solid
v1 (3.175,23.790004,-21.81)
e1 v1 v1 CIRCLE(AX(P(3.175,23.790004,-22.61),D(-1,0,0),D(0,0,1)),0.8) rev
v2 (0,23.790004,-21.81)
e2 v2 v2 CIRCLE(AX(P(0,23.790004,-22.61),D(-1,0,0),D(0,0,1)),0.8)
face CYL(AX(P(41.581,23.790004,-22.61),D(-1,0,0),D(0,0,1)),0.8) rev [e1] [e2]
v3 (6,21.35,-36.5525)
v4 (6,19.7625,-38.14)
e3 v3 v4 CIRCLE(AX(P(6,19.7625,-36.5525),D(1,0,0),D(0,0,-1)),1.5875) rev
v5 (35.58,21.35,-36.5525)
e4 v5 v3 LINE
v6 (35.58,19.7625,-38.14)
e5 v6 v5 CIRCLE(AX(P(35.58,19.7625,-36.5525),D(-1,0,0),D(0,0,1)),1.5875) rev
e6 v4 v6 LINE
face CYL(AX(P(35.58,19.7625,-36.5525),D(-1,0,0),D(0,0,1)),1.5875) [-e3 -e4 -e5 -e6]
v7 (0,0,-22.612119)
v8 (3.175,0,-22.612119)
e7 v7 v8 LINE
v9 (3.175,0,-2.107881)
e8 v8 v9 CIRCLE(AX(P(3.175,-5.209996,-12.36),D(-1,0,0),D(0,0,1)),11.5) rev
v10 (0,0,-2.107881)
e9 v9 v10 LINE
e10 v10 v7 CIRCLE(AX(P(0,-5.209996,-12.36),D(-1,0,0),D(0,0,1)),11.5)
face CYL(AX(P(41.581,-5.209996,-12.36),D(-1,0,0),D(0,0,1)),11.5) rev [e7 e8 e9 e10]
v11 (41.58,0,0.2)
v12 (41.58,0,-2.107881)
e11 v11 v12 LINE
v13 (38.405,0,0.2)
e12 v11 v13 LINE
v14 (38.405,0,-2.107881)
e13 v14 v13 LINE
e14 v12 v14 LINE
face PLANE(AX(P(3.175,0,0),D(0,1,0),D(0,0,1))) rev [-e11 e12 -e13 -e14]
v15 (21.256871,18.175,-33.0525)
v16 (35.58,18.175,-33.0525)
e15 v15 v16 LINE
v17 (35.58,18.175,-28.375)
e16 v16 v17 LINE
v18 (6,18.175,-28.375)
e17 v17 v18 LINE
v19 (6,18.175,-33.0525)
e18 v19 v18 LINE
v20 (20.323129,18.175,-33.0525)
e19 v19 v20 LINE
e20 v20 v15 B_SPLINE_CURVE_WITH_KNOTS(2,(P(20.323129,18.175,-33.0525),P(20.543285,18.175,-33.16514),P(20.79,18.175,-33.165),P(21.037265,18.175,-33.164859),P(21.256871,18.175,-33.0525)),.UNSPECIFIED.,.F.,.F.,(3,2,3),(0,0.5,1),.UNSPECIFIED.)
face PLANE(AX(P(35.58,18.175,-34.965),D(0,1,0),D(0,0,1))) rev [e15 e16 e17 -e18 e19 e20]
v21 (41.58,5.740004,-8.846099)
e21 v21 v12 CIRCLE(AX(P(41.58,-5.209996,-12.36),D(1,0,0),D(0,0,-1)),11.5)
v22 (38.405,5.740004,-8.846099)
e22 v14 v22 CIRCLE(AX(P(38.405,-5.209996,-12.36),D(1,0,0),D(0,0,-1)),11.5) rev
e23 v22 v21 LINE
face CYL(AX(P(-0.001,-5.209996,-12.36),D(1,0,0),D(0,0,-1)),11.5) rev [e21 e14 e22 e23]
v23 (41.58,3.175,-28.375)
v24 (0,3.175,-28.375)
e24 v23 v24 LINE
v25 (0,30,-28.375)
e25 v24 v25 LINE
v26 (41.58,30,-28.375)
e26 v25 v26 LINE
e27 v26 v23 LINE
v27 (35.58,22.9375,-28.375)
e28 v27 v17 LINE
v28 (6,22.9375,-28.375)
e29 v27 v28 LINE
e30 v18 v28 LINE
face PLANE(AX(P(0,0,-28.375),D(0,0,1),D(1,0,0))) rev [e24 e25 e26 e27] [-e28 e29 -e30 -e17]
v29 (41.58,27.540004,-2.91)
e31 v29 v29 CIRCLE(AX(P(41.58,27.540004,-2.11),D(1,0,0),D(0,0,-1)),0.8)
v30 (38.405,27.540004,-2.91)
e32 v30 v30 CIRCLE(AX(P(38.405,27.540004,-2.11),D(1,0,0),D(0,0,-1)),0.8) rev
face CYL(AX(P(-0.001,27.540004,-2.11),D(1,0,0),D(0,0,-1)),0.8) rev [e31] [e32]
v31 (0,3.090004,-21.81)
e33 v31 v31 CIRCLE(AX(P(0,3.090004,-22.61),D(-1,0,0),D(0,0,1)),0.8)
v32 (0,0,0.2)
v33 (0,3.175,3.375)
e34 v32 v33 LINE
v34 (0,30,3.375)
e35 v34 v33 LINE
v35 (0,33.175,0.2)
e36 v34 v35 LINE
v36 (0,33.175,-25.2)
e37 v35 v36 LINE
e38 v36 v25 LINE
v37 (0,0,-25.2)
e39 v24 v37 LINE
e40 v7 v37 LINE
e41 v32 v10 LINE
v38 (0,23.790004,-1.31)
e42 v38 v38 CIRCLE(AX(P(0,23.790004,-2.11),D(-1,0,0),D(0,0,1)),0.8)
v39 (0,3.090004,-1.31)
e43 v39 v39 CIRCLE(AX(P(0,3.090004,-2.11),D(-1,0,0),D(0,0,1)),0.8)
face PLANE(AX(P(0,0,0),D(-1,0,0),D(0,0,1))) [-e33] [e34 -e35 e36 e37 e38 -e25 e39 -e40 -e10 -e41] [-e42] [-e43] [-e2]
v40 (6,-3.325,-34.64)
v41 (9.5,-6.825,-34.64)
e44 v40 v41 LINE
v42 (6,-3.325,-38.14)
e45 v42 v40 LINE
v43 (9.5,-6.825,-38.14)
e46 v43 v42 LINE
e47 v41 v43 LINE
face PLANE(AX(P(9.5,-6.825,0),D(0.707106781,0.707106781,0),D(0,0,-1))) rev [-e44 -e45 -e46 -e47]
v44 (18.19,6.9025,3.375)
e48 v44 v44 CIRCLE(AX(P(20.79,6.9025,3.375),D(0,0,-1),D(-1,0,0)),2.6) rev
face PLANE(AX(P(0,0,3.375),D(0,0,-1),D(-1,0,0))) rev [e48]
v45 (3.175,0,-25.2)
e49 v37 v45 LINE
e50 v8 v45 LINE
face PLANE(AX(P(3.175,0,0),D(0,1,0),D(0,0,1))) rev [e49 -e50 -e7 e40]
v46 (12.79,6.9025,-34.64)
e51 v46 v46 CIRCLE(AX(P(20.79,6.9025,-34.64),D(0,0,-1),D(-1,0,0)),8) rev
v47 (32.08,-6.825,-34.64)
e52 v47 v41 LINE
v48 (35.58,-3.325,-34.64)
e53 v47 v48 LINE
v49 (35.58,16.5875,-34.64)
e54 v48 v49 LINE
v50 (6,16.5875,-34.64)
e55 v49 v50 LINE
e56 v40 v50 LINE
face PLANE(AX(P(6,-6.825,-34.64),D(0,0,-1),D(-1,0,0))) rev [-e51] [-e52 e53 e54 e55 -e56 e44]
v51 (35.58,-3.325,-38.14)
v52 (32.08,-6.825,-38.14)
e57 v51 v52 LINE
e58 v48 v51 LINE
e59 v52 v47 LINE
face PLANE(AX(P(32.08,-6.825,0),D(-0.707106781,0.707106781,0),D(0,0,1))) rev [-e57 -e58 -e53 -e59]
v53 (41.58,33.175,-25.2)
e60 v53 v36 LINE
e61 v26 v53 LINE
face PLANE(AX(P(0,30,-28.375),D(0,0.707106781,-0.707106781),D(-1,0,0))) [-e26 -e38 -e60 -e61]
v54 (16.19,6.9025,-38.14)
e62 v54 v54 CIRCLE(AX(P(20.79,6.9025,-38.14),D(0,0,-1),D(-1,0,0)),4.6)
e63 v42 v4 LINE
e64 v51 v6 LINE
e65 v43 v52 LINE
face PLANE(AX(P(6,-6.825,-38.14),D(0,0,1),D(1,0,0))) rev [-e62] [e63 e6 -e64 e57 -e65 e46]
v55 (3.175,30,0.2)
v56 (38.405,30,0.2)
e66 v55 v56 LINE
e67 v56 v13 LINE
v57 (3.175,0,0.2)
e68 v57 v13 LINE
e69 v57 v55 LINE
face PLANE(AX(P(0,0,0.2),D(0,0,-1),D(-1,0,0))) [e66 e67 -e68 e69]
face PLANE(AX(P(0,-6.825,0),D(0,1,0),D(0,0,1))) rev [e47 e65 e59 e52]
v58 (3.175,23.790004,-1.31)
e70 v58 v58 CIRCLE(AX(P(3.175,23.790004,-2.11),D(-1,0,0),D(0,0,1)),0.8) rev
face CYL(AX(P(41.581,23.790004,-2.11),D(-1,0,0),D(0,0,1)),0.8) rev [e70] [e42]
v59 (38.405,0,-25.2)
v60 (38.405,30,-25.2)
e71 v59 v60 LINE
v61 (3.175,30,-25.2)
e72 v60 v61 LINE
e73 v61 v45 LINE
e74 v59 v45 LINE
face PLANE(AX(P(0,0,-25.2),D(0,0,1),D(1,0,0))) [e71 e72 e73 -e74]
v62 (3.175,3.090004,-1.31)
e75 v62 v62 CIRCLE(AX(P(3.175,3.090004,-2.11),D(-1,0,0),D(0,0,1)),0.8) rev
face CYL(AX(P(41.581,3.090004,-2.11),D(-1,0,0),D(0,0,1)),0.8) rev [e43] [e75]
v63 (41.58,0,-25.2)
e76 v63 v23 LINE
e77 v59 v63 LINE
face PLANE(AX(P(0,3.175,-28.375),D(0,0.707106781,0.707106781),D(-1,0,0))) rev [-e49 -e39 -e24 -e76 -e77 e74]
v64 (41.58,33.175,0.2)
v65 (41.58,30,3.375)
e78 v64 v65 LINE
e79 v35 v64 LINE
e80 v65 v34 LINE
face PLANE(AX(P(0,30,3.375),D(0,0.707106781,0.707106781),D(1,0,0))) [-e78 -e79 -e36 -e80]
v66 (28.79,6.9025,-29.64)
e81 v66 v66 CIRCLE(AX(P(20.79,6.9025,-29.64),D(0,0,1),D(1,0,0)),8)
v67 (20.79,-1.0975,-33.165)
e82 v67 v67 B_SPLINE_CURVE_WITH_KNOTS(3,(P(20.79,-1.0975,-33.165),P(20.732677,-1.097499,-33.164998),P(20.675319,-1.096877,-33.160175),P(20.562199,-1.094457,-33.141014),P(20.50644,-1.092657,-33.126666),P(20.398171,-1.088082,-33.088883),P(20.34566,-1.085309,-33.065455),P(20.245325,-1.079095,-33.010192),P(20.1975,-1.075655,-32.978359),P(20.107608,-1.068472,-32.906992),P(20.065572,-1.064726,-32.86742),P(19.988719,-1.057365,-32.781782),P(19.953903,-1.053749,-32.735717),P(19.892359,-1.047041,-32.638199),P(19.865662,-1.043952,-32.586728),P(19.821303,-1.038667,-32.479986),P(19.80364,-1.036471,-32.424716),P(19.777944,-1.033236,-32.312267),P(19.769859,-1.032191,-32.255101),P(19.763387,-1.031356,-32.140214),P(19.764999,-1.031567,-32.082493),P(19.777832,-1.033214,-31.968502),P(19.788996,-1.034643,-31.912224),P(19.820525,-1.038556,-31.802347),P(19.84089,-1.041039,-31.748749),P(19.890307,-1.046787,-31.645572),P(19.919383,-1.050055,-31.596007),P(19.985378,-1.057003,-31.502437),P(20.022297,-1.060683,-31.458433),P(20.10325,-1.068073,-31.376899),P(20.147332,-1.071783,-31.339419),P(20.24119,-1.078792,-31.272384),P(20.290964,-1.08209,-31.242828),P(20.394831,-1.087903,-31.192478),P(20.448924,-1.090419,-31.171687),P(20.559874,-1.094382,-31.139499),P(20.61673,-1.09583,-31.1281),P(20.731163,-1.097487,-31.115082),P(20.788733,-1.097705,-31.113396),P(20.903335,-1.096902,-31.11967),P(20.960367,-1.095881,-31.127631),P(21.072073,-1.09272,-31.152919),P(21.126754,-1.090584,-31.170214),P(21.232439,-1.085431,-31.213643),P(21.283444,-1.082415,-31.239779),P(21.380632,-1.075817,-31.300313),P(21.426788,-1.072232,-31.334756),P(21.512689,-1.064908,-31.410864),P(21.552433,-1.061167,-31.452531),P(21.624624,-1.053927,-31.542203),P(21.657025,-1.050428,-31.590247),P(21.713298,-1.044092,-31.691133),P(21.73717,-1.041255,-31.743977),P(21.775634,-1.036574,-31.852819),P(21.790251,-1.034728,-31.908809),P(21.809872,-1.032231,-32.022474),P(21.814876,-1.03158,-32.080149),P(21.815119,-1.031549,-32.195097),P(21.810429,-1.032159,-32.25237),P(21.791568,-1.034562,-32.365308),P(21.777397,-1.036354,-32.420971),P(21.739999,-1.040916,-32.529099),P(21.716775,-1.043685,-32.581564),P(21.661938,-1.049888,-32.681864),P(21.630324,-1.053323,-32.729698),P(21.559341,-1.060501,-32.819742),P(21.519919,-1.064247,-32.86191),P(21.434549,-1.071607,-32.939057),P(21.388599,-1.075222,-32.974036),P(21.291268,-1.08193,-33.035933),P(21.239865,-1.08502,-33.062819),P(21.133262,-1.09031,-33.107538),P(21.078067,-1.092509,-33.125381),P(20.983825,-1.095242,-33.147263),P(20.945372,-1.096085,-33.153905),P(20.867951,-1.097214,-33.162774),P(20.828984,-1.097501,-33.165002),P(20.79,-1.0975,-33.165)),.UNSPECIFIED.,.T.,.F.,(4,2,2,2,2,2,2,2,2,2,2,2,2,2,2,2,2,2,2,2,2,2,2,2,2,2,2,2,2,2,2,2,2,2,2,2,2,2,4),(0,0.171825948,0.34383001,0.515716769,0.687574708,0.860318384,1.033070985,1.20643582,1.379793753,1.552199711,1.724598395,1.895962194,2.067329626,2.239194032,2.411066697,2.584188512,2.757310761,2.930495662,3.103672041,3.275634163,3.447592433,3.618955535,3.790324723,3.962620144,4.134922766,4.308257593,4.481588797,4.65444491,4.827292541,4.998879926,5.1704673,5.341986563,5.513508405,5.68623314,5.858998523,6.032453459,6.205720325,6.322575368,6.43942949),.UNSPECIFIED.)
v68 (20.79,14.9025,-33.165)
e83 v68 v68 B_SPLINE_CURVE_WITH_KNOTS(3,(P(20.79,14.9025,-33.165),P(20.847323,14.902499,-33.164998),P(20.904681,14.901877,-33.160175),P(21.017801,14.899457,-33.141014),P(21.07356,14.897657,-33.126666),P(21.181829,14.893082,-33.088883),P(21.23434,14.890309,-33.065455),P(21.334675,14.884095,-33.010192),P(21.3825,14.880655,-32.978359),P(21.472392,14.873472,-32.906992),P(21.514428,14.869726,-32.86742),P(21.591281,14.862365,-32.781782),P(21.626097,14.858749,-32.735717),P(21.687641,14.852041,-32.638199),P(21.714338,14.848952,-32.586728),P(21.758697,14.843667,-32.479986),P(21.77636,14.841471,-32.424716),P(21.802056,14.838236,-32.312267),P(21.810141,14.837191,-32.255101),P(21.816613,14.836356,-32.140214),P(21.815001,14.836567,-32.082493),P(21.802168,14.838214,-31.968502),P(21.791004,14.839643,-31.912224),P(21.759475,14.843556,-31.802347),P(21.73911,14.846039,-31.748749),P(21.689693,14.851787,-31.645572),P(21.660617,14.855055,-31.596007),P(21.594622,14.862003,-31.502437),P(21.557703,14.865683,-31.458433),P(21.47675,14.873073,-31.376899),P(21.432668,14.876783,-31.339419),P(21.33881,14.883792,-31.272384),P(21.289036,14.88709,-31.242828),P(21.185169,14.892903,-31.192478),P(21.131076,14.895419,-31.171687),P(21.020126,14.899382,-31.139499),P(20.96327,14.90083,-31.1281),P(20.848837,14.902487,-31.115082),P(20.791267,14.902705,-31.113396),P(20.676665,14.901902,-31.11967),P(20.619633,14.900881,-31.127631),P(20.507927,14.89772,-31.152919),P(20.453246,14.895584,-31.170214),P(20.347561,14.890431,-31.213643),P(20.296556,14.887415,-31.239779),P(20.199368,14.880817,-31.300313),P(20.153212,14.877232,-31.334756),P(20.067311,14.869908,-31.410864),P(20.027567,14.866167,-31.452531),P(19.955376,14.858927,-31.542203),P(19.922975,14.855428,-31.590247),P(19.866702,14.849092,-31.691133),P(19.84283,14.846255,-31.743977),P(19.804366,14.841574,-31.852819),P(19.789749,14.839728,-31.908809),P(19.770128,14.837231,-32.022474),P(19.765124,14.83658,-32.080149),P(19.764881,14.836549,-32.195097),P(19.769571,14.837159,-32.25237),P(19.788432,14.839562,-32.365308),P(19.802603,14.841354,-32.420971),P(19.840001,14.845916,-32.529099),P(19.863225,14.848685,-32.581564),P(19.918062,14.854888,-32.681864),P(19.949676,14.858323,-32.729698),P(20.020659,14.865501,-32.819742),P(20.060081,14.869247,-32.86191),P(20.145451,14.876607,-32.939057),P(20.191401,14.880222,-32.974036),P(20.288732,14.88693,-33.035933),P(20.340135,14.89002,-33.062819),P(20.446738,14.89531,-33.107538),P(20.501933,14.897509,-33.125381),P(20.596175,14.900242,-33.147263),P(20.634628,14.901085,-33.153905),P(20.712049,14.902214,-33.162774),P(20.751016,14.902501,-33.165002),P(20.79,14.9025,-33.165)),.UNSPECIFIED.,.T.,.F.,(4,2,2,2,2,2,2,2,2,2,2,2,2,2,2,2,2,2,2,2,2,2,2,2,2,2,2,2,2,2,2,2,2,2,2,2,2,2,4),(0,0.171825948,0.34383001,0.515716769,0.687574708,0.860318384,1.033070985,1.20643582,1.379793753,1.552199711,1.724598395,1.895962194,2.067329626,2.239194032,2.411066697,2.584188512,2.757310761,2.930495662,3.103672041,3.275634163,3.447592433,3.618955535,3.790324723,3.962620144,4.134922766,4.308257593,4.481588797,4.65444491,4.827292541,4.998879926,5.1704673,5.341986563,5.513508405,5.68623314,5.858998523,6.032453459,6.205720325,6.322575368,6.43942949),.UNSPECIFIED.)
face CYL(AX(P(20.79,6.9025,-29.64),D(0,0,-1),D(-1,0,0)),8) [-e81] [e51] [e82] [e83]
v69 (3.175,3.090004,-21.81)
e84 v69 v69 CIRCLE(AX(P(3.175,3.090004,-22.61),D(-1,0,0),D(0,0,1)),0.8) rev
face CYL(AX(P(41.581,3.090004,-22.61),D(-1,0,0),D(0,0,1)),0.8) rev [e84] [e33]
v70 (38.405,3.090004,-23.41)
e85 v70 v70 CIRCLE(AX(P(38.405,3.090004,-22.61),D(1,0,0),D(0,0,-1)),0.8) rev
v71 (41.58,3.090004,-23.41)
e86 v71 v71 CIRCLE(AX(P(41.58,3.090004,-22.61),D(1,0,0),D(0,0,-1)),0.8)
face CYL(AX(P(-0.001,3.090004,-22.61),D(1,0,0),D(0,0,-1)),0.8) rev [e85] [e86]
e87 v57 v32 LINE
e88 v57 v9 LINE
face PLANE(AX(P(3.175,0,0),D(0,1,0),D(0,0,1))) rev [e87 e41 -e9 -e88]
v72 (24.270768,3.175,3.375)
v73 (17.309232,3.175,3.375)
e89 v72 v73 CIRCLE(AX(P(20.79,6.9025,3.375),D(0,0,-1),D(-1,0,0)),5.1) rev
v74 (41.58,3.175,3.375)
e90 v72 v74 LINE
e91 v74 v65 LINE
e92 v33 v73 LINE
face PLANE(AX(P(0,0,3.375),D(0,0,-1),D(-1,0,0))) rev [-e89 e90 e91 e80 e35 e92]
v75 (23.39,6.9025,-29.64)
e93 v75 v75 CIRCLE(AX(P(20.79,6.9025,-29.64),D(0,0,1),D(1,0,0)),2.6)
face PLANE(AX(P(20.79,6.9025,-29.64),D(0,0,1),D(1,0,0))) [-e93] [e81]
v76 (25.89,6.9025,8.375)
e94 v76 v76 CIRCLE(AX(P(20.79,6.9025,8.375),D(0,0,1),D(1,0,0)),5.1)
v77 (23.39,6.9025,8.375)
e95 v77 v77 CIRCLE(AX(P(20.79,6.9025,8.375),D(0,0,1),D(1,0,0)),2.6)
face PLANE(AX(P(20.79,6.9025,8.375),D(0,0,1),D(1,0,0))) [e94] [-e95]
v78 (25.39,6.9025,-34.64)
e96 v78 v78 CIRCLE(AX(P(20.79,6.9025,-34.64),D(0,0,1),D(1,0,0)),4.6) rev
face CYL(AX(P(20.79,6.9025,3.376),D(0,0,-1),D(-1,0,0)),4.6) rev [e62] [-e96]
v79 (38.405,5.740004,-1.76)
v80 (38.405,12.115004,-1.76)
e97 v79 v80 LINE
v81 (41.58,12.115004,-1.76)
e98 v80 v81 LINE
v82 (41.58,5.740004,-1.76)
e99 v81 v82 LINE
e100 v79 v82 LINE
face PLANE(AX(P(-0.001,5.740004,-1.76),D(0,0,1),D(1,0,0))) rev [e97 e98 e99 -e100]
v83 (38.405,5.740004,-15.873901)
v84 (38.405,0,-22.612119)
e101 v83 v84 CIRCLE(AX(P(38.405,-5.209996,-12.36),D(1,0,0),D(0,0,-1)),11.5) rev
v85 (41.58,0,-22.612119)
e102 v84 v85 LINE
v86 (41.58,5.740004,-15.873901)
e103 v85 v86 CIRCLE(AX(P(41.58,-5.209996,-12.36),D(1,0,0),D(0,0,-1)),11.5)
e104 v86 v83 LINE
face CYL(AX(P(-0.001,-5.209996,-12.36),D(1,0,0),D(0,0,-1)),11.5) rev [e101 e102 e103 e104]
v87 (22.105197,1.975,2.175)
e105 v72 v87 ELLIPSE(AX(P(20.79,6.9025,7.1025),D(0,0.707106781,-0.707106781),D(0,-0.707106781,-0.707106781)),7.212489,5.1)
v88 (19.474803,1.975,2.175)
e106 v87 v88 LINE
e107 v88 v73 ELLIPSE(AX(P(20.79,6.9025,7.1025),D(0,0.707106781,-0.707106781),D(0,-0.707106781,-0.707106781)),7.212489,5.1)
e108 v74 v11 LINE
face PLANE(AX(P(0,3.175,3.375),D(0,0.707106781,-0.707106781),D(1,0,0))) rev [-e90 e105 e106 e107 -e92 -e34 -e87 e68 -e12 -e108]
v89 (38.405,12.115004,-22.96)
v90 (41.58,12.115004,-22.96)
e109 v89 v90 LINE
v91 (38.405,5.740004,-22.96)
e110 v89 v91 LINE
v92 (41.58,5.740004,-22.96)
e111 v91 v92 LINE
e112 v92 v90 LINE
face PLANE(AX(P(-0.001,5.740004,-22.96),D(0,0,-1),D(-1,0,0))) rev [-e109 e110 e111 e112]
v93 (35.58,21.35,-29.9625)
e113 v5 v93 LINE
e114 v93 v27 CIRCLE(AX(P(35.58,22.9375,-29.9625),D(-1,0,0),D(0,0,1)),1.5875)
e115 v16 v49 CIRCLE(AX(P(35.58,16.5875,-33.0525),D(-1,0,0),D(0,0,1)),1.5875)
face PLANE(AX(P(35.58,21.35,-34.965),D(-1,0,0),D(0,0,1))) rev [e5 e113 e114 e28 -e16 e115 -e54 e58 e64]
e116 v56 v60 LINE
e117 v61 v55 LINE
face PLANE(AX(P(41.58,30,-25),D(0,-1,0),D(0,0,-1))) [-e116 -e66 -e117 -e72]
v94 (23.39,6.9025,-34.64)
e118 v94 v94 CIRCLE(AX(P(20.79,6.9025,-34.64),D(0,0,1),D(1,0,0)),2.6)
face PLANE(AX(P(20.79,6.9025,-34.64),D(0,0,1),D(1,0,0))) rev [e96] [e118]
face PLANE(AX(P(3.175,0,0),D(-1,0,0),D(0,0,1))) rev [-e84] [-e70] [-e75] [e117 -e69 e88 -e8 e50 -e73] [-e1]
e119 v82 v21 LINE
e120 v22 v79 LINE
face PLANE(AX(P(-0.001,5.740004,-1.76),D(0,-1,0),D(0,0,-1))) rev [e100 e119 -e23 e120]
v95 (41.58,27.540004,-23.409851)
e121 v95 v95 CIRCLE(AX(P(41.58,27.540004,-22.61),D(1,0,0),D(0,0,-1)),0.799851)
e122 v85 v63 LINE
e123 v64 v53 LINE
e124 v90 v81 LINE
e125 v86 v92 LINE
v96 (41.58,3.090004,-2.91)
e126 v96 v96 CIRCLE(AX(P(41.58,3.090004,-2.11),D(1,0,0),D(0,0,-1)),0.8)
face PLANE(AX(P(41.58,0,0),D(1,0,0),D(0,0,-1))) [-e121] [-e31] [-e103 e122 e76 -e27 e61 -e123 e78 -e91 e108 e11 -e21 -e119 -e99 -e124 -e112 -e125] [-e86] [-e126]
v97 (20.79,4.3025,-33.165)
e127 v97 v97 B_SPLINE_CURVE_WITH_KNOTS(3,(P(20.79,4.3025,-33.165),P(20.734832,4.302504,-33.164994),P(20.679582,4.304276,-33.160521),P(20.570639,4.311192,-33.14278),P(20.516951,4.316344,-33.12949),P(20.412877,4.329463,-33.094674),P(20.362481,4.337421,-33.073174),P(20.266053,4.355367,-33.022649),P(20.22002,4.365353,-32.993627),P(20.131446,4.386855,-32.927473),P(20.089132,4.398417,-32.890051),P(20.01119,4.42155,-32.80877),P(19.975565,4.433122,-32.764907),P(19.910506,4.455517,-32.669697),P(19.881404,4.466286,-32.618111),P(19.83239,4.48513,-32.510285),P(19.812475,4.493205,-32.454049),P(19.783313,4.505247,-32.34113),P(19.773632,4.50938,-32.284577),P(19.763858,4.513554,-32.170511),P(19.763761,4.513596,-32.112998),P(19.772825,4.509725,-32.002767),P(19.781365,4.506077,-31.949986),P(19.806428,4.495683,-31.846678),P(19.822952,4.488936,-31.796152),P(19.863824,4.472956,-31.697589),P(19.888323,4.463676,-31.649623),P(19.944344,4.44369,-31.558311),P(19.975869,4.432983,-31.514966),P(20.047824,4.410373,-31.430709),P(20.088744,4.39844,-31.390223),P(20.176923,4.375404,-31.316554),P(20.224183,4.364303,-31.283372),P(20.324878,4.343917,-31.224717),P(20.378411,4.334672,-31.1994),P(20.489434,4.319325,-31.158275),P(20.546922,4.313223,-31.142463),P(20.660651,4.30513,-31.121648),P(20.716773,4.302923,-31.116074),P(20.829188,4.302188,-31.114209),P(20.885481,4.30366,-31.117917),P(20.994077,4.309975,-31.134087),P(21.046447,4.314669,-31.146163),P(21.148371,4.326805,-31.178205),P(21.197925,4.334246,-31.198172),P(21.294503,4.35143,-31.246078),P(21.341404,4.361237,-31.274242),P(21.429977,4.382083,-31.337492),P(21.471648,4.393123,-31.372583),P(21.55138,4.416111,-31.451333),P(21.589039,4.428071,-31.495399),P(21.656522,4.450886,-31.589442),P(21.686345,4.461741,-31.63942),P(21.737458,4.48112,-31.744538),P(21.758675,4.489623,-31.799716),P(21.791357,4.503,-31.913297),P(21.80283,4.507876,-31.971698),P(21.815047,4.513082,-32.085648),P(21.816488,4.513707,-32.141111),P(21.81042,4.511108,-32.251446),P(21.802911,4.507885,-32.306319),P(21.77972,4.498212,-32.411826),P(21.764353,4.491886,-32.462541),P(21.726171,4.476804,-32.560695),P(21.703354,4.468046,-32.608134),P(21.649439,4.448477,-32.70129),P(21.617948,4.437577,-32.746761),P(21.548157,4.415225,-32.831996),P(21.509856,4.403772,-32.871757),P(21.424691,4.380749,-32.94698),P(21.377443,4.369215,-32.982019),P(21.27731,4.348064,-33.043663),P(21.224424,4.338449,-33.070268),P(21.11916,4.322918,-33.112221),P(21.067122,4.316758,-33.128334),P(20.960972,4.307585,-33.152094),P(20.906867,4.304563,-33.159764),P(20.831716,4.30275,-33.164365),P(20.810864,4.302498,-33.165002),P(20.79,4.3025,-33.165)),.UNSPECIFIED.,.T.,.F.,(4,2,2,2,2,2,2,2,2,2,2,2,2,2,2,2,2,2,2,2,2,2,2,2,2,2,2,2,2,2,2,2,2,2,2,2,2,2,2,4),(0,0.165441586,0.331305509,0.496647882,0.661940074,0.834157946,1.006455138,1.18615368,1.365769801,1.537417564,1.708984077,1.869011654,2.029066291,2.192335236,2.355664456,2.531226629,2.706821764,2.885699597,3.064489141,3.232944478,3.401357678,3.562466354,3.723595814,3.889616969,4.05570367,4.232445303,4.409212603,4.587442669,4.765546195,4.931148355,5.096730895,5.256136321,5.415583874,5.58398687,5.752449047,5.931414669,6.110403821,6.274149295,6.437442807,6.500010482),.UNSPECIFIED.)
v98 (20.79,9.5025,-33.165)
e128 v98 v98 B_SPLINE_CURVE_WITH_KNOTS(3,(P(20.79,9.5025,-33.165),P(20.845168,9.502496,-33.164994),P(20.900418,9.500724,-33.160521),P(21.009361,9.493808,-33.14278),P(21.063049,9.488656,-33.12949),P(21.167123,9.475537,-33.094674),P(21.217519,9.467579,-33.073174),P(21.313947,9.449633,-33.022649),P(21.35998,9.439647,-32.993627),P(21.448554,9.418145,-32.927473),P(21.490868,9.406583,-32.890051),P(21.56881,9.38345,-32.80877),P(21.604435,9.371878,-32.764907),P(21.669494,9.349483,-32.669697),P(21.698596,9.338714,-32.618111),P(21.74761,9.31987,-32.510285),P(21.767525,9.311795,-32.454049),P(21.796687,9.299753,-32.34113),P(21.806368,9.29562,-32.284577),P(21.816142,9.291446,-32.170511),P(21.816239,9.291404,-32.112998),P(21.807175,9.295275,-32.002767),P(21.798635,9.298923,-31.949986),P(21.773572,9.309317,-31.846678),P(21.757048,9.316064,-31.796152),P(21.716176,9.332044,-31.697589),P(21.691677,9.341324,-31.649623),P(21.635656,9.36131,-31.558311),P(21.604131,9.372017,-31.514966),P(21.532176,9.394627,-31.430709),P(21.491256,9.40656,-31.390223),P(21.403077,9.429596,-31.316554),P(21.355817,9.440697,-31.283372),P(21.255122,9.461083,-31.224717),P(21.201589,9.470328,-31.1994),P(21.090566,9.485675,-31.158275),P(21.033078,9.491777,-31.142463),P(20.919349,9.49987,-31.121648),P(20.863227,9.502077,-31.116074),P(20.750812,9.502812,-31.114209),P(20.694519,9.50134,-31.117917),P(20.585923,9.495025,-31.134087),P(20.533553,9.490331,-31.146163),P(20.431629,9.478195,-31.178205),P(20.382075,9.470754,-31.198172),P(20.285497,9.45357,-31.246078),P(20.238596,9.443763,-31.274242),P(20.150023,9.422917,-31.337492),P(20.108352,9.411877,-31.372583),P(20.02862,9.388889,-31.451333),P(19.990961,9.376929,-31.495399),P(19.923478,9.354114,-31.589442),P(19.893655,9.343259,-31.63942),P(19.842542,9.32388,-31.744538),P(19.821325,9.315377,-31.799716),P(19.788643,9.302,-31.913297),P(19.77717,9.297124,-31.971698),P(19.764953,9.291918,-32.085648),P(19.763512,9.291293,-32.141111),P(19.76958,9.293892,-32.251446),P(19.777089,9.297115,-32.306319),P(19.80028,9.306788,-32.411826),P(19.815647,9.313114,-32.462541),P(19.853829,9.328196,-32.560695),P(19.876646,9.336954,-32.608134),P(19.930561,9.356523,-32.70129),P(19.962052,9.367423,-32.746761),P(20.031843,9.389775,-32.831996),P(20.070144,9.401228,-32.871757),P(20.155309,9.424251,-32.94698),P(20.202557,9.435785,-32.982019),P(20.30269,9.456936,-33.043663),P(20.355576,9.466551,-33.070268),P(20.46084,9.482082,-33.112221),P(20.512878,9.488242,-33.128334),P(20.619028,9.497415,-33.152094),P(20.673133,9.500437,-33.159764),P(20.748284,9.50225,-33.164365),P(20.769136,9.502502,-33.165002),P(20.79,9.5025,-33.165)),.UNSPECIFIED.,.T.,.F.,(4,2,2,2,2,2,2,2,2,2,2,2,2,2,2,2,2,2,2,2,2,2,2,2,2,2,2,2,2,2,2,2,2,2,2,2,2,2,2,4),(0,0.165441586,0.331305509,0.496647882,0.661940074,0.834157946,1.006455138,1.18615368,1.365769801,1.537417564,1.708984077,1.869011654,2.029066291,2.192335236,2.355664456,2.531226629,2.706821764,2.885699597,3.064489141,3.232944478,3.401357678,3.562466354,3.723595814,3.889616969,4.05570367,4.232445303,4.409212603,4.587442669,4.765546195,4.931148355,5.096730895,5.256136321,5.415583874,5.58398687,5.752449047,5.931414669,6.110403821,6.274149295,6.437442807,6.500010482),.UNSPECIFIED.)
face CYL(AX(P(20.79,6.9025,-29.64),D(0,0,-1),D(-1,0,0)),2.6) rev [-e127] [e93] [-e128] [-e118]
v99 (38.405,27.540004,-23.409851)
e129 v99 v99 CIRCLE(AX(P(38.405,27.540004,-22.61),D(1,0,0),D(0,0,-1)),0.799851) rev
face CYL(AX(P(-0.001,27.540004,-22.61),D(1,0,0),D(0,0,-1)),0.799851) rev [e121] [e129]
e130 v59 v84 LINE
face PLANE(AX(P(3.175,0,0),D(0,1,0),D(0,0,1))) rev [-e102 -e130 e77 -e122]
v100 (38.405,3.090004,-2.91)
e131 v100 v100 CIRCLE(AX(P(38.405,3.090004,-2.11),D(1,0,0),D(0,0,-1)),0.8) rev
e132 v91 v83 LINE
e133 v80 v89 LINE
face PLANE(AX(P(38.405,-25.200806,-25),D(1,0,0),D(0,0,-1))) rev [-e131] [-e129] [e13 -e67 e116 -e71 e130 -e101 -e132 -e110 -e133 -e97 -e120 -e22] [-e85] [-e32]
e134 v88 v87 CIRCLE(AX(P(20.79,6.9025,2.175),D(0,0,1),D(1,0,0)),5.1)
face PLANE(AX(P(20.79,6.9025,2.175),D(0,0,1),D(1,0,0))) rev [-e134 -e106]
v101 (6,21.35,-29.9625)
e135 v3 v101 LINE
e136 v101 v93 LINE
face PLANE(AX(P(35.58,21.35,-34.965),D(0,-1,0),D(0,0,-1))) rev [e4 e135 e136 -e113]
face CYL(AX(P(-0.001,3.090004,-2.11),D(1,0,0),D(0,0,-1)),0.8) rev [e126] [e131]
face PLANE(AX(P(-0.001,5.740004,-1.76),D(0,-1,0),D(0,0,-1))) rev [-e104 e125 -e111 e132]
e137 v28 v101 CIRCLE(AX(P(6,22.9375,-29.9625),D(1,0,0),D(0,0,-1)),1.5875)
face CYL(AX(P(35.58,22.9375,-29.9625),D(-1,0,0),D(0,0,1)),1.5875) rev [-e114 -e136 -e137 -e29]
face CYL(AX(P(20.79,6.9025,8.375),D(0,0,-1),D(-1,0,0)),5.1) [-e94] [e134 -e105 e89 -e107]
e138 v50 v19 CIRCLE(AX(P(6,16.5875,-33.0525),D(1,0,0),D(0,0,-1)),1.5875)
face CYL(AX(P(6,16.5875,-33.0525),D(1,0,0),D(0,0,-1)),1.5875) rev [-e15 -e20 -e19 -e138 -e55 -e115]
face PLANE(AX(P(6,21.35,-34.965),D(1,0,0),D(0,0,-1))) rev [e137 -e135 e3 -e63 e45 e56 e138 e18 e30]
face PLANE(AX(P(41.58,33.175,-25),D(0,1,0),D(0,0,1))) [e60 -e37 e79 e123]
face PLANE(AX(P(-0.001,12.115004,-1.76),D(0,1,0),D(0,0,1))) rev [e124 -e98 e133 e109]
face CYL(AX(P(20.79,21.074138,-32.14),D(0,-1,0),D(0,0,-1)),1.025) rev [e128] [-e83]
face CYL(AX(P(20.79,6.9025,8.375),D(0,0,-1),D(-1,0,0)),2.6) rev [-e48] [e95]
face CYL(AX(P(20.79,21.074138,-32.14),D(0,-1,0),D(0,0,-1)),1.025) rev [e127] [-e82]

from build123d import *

# Parameters (mm, degrees)
SKETCH1_W                       = 25
SKETCH1_H                       = 30
BOSS_EXTRUDE1_DEPTH             = 3.175
SKETCH2_W                       = 25
SKETCH2_H                       = 3.175
BOSS_EXTRUDE2_DEPTH             = 41.58
SKETCH3_W                       = 3.175
SKETCH3_H                       = 25
BOSS_EXTRUDE3_DEPTH             = 30
CUT_EXTRUDE1_REACH              = 60.775
SKETCH4_R                       = 11.5
CUT_EXTRUDE2_REACH              = 60.775
SKETCH5_R                       = 0.8
CUT_EXTRUDE3_REACH              = 60.775
SKETCH6_R                       = 0.8
SKETCH6_R_2                     = 0.799851166
SKETCH6_W                       = 21.2
SKETCH6_H                       = 6.375
CUT_EXTRUDE4_REACH              = 60.775
SKETCH7_R                       = 11.5
BOSS_EXTRUDE4_DEPTH             = 0.2
SKETCH9_W                       = 41.58
SKETCH9_H                       = 33.175
BOSS_EXTRUDE5_DEPTH             = 3.175
BOSS_EXTRUDE6_DEPTH             = 0.2
SKETCH11_W                      = 41.58
SKETCH11_H                      = 33.175
BOSS_EXTRUDE7_DEPTH             = 3.175
CHAMFER1_SIZE                   = 3.175
CHAMFER2_SIZE                   = 3.175
SKETCH13_W                      = 29.58
SKETCH13_H                      = 3.175
BOSS_EXTRUDE8_DEPTH             = 6.59
BOSS_EXTRUDE9_REACH             = 59.287
SKETCH14_W                      = 29.58
SKETCH14_H                      = 3.5
BOSS_EXTRUDE9_DIRECTION_2_DEPTH = 25
CHAMFER3_SIZE                   = 3.5
FILLET1_R                       = 1.5875
FILLET2_R                       = 1.5875
CUT_EXTRUDE5_REACH              = 69.476
SKETCH16_R                      = 4.6
SKETCH20_R                      = 8
SKETCH20_R_2                    = 2.6
BOSS_EXTRUDE11_DEPTH            = 5
CUT_EXTRUDE6_START              = -21.7275
SKETCH21_R                      = 1.025
CUT_EXTRUDE6_DEPTH              = 16
BOSS_EXTRUDE12_DEPTH            = 5
BOSS_EXTRUDE12_DEPTH_BACK       = 1.2
SKETCH23_R                      = 5.1
SKETCH23_R_2                    = 2.6


with BuildPart() as part:
    # Sketch1 → Boss-Extrude1 (new body)
    with BuildSketch(Plane(origin=(0, 0, 0), x_dir=(0, 0, -1), z_dir=(1, 0, 0))):
        with Locations((12.5, 15)):
            Rectangle(SKETCH1_W, SKETCH1_H)
    extrude(amount=BOSS_EXTRUDE1_DEPTH)

    # Sketch2 → Boss-Extrude2 (add)
    with BuildSketch(Plane.ZY):
        with Locations((-12.5, 31.5875)):
            Rectangle(SKETCH2_W, SKETCH2_H)
    extrude(amount=-BOSS_EXTRUDE2_DEPTH)

    # Sketch3 → Boss-Extrude3 (add)
    with BuildSketch(Plane.XZ.offset(-30)):
        with Locations((39.9925, -12.5)):
            Rectangle(SKETCH3_W, SKETCH3_H)
    extrude(amount=BOSS_EXTRUDE3_DEPTH)

    # Sketch4 → Cut-Extrude1 (cut, up to next)
    with BuildSketch(Plane.ZY, mode=Mode.PRIVATE) as cut_extrude1_sk1:
        with Locations((-12.359999929, -5.209996254)):
            Circle(SKETCH4_R)
    cut_extrude1_tool1 = extrude(cut_extrude1_sk1.sketch, amount=-CUT_EXTRUDE1_REACH, mode=Mode.PRIVATE) & part.part
    add(cut_extrude1_tool1.solids().sort_by_distance((0, -5.209996, -12.36))[0], mode=Mode.SUBTRACT)

    # Sketch5 → Cut-Extrude2 (cut, up to next)
    with BuildSketch(Plane.ZY, mode=Mode.PRIVATE) as cut_extrude2_sk1:
        with Locations((-22.609999929, 3.090003746)):
            Circle(SKETCH5_R)
    cut_extrude2_tool1 = extrude(cut_extrude2_sk1.sketch, amount=-CUT_EXTRUDE2_REACH, mode=Mode.PRIVATE) & part.part
    # Sketch5 → Cut-Extrude2 (cut, up to next)
    with BuildSketch(Plane.ZY, mode=Mode.PRIVATE) as cut_extrude2_sk2:
        with Locations((-22.609999929, 23.790003746)):
            Circle(SKETCH5_R)
    cut_extrude2_tool2 = extrude(cut_extrude2_sk2.sketch, amount=-CUT_EXTRUDE2_REACH, mode=Mode.PRIVATE) & part.part
    # Sketch5 → Cut-Extrude2 (cut, up to next)
    with BuildSketch(Plane.ZY, mode=Mode.PRIVATE) as cut_extrude2_sk3:
        with Locations((-2.109999929, 23.790003746)):
            Circle(SKETCH5_R)
    cut_extrude2_tool3 = extrude(cut_extrude2_sk3.sketch, amount=-CUT_EXTRUDE2_REACH, mode=Mode.PRIVATE) & part.part
    # Sketch5 → Cut-Extrude2 (cut, up to next)
    with BuildSketch(Plane.ZY, mode=Mode.PRIVATE) as cut_extrude2_sk4:
        with Locations((-2.109999929, 3.090003746)):
            Circle(SKETCH5_R)
    cut_extrude2_tool4 = extrude(cut_extrude2_sk4.sketch, amount=-CUT_EXTRUDE2_REACH, mode=Mode.PRIVATE) & part.part
    add(cut_extrude2_tool1.solids().sort_by_distance((0, 3.090004, -22.61))[0], mode=Mode.SUBTRACT)
    add(cut_extrude2_tool2.solids().sort_by_distance((0, 23.790004, -22.61))[0], mode=Mode.SUBTRACT)
    add(cut_extrude2_tool3.solids().sort_by_distance((0, 23.790004, -2.11))[0], mode=Mode.SUBTRACT)
    add(cut_extrude2_tool4.solids().sort_by_distance((0, 3.090004, -2.11))[0], mode=Mode.SUBTRACT)

    # Sketch6 → Cut-Extrude3 (cut, up to next)
    with BuildSketch(Plane(origin=(41.58, 0, 0), x_dir=(0, 0, -1), z_dir=(1, 0, 0)), mode=Mode.PRIVATE) as cut_extrude3_sk1:
        with Locations(Location((2.109999929, 3.090003746, 0), (0, 0, 180))):
            Circle(SKETCH6_R)
    cut_extrude3_tool1 = extrude(cut_extrude3_sk1.sketch, amount=-CUT_EXTRUDE3_REACH, mode=Mode.PRIVATE) & part.part
    # Sketch6 → Cut-Extrude3 (cut, up to next)
    with BuildSketch(Plane(origin=(41.58, 0, 0), x_dir=(0, 0, -1), z_dir=(1, 0, 0)), mode=Mode.PRIVATE) as cut_extrude3_sk2:
        with Locations(Location((22.609999929, 3.090003746, 0), (0, 0, 180))):
            Circle(SKETCH6_R)
    cut_extrude3_tool2 = extrude(cut_extrude3_sk2.sketch, amount=-CUT_EXTRUDE3_REACH, mode=Mode.PRIVATE) & part.part
    # Sketch6 → Cut-Extrude3 (cut, up to next)
    with BuildSketch(Plane(origin=(41.58, 0, 0), x_dir=(0, 0, -1), z_dir=(1, 0, 0)), mode=Mode.PRIVATE) as cut_extrude3_sk3:
        with Locations((22.609999929, 27.540003746)):
            Circle(SKETCH6_R_2)
    cut_extrude3_tool3 = extrude(cut_extrude3_sk3.sketch, amount=-CUT_EXTRUDE3_REACH, mode=Mode.PRIVATE) & part.part
    # Sketch6 → Cut-Extrude3 (cut, up to next)
    with BuildSketch(Plane(origin=(41.58, 0, 0), x_dir=(0, 0, -1), z_dir=(1, 0, 0)), mode=Mode.PRIVATE) as cut_extrude3_sk4:
        with Locations((2.109999929, 27.540003746)):
            Circle(SKETCH6_R)
    cut_extrude3_tool4 = extrude(cut_extrude3_sk4.sketch, amount=-CUT_EXTRUDE3_REACH, mode=Mode.PRIVATE) & part.part
    # Sketch6 → Cut-Extrude3 (cut, up to next)
    with BuildSketch(Plane(origin=(41.58, 0, 0), x_dir=(0, 0, -1), z_dir=(1, 0, 0)), mode=Mode.PRIVATE) as cut_extrude3_sk5:
        with Locations((12.359999929, 8.927503746)):
            Rectangle(SKETCH6_W, SKETCH6_H)
    cut_extrude3_tool5 = extrude(cut_extrude3_sk5.sketch, amount=-CUT_EXTRUDE3_REACH, mode=Mode.PRIVATE) & part.part
    add(cut_extrude3_tool1.solids().sort_by_distance((41.58, 3.090004, -2.11))[0], mode=Mode.SUBTRACT)
    add(cut_extrude3_tool2.solids().sort_by_distance((41.58, 3.090004, -22.61))[0], mode=Mode.SUBTRACT)
    add(cut_extrude3_tool3.solids().sort_by_distance((41.58, 27.540004, -22.61))[0], mode=Mode.SUBTRACT)
    add(cut_extrude3_tool4.solids().sort_by_distance((41.58, 27.540004, -2.11))[0], mode=Mode.SUBTRACT)
    add(cut_extrude3_tool5.solids().sort_by_distance((41.58, 8.927504, -12.36))[0], mode=Mode.SUBTRACT)

    # Sketch7 → Cut-Extrude4 (cut, up to next)
    with BuildSketch(Plane(origin=(41.58, 0, 0), x_dir=(0, 0, -1), z_dir=(1, 0, 0)), mode=Mode.PRIVATE) as cut_extrude4_sk1:
        with Locations((12.359999929, -5.209996254)):
            Circle(SKETCH7_R)
    cut_extrude4_tool1 = extrude(cut_extrude4_sk1.sketch, amount=-CUT_EXTRUDE4_REACH, mode=Mode.PRIVATE) & part.part
    add(cut_extrude4_tool1.solids().sort_by_distance((41.58, -5.209996, -12.36))[0], mode=Mode.SUBTRACT)

    # Sketch8 → Boss-Extrude4 (add)
    with BuildSketch(Plane.XY):
        Polygon((0, 33.175), (0, 0), (3.175, 0), (3.175, 30), (38.405, 30), (38.405, 0), (41.58, 0), (41.58, 33.175), align=None)
    extrude(amount=BOSS_EXTRUDE4_DEPTH)

    # Sketch9 → Boss-Extrude5 (add)
    with BuildSketch(Plane.XY.offset(0.2)):
        with Locations((20.79, 16.5875)):
            Rectangle(SKETCH9_W, SKETCH9_H)
    extrude(amount=BOSS_EXTRUDE5_DEPTH)

    # Sketch10 → Boss-Extrude6 (add)
    with BuildSketch(Plane(origin=(0, 0, -25), x_dir=(-1, 0, 0), z_dir=(0, 0, -1))):
        Polygon((0, 0), (0, 33.175), (-41.58, 33.175), (-41.58, 0), (-38.405, 0), (-38.405, 30), (-3.175, 30), (-3.175, 0), align=None)
    extrude(amount=BOSS_EXTRUDE6_DEPTH)

    # Sketch11 → Boss-Extrude7 (add)
    with BuildSketch(Plane(origin=(0, 0, -25.2), x_dir=(-1, 0, 0), z_dir=(0, 0, -1))):
        with Locations((-20.79, 16.5875)):
            Rectangle(SKETCH11_W, SKETCH11_H)
    extrude(amount=BOSS_EXTRUDE7_DEPTH)

    # Chamfer1
    chamfer1_edges = [part.edges().sort_by_distance(p)[0] for p in [
        (20.79, 33.175, 3.375),
        (20.79, 33.175, -28.375),
    ]]
    chamfer(chamfer1_edges, length=CHAMFER1_SIZE)

    # Chamfer2
    chamfer2_edges = [part.edges().sort_by_distance(p)[0] for p in [
        (20.79, 0, 3.375),
        (20.79, 0, -28.375),
    ]]
    chamfer(chamfer2_edges, length=CHAMFER2_SIZE - 0.0001)  # a hair under: the kernel refuses the full size

    # Sketch13 → Boss-Extrude8 (add)
    with BuildSketch(Plane(origin=(0, 0, -28.375), x_dir=(-1, 0, 0), z_dir=(0, 0, -1))):
        with Locations((-20.79, 19.7625)):
            Rectangle(SKETCH13_W, SKETCH13_H)
    extrude(amount=BOSS_EXTRUDE8_DEPTH)

    # Boss-Extrude9: up to this face of the body (flat: up to its plane)
    boss_extrude9_end = Plane(part.part.faces().sort_by_distance((20.79, 21.35, -31.67))[0])
    # Sketch14 → Boss-Extrude9 (add, up to the picked face)
    with BuildSketch(Plane.XZ.offset(-18.175), mode=Mode.PRIVATE) as boss_extrude9_sk1:
        with Locations((20.79, -36.39)):
            Rectangle(SKETCH14_W, SKETCH14_H)
    boss_extrude9_tool1 = split(extrude(boss_extrude9_sk1.sketch, amount=-BOSS_EXTRUDE9_REACH, mode=Mode.PRIVATE), bisect_by=boss_extrude9_end, keep=Keep.BOTH, mode=Mode.PRIVATE)
    add(boss_extrude9_tool1.solids().sort_by(Axis((20.79, 18.175, -36.39), (0, 1, 0)))[0])

    # Sketch14 → Boss-Extrude9 direction 2 (add)
    with BuildSketch(Plane.XZ.offset(-18.175)):
        with Locations((20.79, -36.39)):
            Rectangle(SKETCH14_W, SKETCH14_H)
    extrude(amount=BOSS_EXTRUDE9_DIRECTION_2_DEPTH)

    # Chamfer3
    chamfer3_edges = [part.edges().sort_by_distance(p)[0] for p in [
        (6, -6.825, -36.39),
        (35.58, -6.825, -36.39),
    ]]
    chamfer(chamfer3_edges, length=CHAMFER3_SIZE)

    # Fillet1
    fillet1_edges = [part.edges().sort_by_distance(p)[0] for p in [
        (20.79, 18.175, -34.64),
        (20.79, 21.35, -38.14),
    ]]
    fillet(fillet1_edges, radius=FILLET1_R)

    # Fillet2
    fillet2_edges = [part.edges().sort_by_distance(p)[0] for p in [
        (20.79, 21.35, -28.375),
    ]]
    fillet(fillet2_edges, radius=FILLET2_R)

    # Sketch16 → Cut-Extrude5 (cut, up to next)
    with BuildSketch(Plane(origin=(0, 0, -38.14), x_dir=(-1, 0, 0), z_dir=(0, 0, -1)), mode=Mode.PRIVATE) as cut_extrude5_sk1:
        with Locations((-20.79, 6.9025)):
            Circle(SKETCH16_R)
    cut_extrude5_tool1 = extrude(cut_extrude5_sk1.sketch, amount=-CUT_EXTRUDE5_REACH, mode=Mode.PRIVATE) & part.part
    add(cut_extrude5_tool1.solids().sort_by_distance((20.79, 6.9025, -38.14))[0], mode=Mode.SUBTRACT)

    # Sketch20 → Boss-Extrude11 (add)
    with BuildSketch(Plane.XY.offset(-34.64)):
        with Locations(Location((20.79, 6.9025, 0), (0, 0, 180))):
            Circle(SKETCH20_R)
        with Locations((20.79, 6.9025)):
            Circle(SKETCH20_R_2, mode=Mode.SUBTRACT)
    extrude(amount=BOSS_EXTRUDE11_DEPTH)

    # Sketch21 → Cut-Extrude6 (cut)
    with BuildSketch(Plane.XZ.offset(6.825).offset(CUT_EXTRUDE6_START)):
        with Locations(Location((20.79, -32.14, 0), (0, 0, 270))):
            Circle(SKETCH21_R)
    extrude(amount=CUT_EXTRUDE6_DEPTH, mode=Mode.SUBTRACT)

    # Sketch23 → Boss-Extrude12 (add, two sides: drawn at the far end of the back side and taken through both)
    with BuildSketch(Plane.XY.offset(3.375).offset(-BOSS_EXTRUDE12_DEPTH_BACK)):
        with Locations(Location((20.79, 6.9025, 0), (0, 0, 226.960415899))):
            Circle(SKETCH23_R)
        with Locations((20.79, 6.9025)):
            Circle(SKETCH23_R_2, mode=Mode.SUBTRACT)
    extrude(amount=BOSS_EXTRUDE12_DEPTH + BOSS_EXTRUDE12_DEPTH_BACK)


solid = part.part
